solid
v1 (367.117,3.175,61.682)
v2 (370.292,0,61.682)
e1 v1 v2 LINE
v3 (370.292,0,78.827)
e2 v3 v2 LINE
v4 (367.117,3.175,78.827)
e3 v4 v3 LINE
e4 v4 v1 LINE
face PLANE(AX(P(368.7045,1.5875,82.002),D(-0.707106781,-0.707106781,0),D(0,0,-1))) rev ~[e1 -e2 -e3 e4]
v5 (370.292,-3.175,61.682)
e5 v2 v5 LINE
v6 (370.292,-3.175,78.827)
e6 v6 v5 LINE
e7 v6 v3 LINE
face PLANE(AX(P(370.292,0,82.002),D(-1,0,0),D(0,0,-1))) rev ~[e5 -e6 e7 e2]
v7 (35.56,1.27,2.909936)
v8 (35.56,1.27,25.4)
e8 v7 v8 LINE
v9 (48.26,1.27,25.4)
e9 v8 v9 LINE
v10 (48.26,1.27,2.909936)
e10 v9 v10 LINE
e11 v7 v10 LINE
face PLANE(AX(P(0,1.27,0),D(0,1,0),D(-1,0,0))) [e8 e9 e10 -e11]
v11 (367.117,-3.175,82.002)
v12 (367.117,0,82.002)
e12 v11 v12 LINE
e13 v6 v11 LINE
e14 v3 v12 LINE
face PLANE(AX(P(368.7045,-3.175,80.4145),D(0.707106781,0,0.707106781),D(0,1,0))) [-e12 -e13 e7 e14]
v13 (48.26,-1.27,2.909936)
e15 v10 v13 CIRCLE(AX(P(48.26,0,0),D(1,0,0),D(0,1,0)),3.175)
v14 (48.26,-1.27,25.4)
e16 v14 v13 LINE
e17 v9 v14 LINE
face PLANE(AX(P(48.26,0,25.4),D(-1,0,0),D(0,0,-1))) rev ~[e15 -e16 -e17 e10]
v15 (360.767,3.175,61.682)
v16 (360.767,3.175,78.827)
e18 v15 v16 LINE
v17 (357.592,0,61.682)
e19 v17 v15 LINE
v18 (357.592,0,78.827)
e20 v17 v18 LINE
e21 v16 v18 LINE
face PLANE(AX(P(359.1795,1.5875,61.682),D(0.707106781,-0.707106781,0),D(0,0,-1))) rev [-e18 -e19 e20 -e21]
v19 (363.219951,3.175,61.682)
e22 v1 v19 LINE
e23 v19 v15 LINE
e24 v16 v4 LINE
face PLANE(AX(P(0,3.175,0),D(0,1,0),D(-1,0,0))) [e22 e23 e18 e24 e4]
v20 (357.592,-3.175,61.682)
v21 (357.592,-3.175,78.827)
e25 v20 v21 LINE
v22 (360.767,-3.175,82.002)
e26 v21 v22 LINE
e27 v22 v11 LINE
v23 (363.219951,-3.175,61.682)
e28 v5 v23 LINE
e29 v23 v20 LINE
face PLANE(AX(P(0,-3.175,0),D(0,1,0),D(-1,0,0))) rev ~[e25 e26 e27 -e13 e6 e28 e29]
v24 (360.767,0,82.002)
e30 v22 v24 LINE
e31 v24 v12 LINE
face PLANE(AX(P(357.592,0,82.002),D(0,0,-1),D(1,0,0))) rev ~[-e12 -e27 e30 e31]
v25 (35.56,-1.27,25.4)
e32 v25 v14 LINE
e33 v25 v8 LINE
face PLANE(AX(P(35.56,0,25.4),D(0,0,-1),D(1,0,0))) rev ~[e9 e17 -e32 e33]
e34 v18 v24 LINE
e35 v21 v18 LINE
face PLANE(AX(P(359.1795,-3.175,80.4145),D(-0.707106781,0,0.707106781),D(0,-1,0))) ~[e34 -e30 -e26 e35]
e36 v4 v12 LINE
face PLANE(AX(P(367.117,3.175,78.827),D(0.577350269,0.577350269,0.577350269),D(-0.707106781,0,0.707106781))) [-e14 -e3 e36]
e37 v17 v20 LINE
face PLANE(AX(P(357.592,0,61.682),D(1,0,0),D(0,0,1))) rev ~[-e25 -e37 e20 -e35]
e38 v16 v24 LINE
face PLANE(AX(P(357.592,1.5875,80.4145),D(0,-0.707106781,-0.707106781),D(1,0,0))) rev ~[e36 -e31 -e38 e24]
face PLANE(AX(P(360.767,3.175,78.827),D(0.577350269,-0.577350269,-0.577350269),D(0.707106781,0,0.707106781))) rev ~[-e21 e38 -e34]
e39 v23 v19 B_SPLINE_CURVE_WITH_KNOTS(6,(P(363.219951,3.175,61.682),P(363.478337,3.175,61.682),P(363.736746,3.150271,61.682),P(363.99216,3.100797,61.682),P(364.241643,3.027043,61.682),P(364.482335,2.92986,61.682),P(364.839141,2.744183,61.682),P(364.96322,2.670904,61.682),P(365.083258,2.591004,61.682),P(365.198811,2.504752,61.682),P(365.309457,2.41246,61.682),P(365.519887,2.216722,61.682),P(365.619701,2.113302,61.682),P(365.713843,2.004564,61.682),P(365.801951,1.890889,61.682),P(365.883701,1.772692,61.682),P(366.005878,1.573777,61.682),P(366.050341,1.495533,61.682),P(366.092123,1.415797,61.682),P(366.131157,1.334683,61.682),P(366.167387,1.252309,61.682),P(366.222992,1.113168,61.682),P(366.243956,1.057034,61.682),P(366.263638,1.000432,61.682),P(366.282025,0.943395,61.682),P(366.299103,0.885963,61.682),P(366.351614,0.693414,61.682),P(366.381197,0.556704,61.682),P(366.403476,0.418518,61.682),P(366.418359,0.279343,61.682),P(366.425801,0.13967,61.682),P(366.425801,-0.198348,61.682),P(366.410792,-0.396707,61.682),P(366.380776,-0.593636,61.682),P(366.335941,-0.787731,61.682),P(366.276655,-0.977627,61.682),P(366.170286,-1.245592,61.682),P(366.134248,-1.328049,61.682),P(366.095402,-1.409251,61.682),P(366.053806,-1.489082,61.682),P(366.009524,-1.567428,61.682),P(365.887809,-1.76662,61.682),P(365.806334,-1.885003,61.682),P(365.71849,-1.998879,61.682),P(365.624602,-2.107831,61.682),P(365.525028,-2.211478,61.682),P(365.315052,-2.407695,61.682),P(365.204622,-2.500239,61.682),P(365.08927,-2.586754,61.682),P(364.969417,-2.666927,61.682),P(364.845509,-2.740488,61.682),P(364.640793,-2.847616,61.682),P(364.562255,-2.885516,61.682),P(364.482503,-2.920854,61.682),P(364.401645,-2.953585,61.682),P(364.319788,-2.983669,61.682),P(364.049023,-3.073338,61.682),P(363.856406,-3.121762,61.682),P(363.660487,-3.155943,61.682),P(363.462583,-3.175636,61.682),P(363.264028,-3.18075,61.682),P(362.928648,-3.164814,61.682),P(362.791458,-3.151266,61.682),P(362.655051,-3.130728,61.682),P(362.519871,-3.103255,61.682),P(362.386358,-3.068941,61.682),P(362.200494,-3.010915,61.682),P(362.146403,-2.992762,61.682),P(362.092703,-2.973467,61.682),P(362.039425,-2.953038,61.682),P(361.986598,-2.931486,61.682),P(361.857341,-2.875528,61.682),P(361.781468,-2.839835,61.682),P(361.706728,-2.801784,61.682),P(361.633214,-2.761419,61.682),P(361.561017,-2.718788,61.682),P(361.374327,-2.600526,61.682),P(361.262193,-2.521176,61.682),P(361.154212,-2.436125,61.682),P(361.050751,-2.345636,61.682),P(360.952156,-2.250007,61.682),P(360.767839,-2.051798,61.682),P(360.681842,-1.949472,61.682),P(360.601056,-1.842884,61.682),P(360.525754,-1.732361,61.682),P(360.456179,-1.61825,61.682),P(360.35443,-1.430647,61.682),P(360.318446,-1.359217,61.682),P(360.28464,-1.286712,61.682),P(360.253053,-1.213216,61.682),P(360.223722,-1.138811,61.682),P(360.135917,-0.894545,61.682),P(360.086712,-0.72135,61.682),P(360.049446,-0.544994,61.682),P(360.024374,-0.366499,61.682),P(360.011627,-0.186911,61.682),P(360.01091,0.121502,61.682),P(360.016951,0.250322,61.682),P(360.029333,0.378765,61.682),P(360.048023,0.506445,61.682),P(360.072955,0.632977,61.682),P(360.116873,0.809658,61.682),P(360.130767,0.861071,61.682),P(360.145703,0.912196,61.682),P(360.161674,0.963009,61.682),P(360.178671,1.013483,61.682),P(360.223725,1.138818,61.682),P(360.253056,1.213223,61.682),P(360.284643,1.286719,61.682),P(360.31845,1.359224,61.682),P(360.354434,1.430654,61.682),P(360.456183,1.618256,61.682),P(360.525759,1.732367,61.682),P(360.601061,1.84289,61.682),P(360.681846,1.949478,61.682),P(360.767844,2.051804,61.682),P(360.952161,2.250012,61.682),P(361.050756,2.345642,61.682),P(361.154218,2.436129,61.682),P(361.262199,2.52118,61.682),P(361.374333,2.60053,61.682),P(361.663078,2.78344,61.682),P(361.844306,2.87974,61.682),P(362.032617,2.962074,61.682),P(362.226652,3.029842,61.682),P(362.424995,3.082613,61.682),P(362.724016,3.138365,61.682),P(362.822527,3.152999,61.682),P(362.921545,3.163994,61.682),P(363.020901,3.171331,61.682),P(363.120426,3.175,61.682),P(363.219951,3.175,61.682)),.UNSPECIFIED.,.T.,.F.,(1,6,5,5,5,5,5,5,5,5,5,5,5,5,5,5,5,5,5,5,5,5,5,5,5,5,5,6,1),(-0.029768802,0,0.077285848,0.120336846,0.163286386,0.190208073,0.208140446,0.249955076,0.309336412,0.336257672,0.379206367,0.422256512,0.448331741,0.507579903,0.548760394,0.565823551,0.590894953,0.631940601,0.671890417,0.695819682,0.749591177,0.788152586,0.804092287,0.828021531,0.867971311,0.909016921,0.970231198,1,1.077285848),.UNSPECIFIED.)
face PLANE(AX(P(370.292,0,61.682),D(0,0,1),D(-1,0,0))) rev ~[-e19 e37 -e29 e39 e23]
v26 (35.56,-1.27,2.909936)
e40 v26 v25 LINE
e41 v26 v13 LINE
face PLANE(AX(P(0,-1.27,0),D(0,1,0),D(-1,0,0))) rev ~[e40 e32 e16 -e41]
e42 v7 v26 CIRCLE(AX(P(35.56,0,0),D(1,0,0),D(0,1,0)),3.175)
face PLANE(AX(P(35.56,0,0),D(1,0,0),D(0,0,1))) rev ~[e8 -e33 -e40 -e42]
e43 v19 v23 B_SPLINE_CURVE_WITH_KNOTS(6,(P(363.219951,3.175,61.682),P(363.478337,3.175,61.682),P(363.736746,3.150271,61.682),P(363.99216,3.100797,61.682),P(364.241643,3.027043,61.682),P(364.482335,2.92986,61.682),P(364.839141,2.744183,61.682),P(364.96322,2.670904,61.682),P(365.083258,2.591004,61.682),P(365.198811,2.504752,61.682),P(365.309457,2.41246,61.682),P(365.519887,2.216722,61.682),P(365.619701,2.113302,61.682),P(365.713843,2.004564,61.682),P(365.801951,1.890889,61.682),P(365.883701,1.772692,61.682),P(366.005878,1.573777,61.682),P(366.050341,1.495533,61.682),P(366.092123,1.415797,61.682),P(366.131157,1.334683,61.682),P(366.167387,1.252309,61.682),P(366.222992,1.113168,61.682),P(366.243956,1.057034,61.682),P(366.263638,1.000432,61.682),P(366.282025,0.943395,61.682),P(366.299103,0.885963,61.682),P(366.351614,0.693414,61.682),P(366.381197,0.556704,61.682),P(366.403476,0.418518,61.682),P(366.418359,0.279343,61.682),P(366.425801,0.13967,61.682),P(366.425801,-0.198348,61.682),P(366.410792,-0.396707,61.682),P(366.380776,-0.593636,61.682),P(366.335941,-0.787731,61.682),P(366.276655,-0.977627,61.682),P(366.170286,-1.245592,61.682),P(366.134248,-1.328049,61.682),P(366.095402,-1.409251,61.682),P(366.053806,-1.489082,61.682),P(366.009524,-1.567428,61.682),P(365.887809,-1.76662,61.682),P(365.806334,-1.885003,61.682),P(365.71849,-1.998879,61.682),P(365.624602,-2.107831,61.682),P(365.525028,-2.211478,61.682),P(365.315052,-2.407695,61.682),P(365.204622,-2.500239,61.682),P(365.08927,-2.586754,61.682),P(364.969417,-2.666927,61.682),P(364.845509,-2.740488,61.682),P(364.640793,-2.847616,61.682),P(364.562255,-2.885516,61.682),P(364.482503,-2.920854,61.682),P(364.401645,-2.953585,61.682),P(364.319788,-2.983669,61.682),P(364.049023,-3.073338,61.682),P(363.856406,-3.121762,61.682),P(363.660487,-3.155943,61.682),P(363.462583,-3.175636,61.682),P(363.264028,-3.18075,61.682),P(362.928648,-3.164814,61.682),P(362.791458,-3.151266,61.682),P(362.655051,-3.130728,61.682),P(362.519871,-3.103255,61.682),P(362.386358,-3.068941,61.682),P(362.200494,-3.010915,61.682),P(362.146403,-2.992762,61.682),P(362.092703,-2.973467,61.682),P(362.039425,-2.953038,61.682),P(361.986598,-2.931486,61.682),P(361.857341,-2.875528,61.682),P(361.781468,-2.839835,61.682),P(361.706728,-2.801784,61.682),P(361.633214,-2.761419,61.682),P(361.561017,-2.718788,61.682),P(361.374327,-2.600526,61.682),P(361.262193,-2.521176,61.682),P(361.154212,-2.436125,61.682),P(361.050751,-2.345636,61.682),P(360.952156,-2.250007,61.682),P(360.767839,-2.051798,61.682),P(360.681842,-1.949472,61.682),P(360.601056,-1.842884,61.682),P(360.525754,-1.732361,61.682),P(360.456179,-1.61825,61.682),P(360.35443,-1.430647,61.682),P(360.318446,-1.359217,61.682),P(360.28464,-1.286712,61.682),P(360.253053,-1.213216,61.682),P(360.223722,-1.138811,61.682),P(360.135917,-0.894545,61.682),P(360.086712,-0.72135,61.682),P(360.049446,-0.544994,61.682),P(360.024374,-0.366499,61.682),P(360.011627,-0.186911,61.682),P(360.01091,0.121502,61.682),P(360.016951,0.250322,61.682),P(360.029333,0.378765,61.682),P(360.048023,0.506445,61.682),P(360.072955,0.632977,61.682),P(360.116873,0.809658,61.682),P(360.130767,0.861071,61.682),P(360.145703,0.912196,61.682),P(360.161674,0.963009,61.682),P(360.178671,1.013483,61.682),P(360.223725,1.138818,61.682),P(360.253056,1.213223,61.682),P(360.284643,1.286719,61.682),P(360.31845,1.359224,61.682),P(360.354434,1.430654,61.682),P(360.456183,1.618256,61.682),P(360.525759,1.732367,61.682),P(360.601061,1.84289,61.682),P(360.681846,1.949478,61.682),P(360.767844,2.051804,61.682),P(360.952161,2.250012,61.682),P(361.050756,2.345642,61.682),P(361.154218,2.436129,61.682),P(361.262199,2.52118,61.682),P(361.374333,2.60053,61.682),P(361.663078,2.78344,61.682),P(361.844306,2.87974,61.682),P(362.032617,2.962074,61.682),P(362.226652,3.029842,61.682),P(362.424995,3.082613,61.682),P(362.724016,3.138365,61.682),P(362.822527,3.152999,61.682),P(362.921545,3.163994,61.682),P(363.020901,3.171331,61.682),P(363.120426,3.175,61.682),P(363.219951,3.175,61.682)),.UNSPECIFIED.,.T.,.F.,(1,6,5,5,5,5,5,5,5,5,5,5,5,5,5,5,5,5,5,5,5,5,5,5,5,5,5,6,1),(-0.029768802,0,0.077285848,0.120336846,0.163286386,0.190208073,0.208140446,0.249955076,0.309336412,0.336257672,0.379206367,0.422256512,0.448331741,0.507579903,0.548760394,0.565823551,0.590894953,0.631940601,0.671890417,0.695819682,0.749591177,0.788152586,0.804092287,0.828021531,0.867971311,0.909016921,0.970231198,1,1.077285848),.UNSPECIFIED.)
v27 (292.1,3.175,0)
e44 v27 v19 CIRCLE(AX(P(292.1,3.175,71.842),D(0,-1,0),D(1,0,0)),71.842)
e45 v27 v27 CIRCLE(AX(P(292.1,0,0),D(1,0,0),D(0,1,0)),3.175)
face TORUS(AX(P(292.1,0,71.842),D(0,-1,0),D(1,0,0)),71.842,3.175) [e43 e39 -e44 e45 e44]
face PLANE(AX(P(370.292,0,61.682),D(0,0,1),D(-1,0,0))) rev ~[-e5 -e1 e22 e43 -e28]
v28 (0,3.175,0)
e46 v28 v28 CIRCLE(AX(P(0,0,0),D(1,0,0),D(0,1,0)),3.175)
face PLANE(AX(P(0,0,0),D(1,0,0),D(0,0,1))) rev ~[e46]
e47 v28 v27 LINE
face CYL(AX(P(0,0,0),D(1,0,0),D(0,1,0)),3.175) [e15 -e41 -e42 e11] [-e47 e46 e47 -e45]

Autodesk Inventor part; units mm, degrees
ref_plane "YZ Plane" through (0, 0, 0) normal (1, 0, 0) x (0, 1, 0)
ref_plane "XZ Plane" through (0, 0, 0) normal (0, 1, 0) x (-1, 0, 0)
ref_plane "XY Plane" through (0, 0, 0) normal (0, 0, 1) x (1, 0, 0)
sketch "Sketch1" plane through (0, 0, 0) normal (1, 0, 0) x (0, 1, 0)
  circle A0 centre (0, 0) radius 3.175
  dimension "d0" = 6.35
sketch "Sketch2" plane through (0, 0, 0) normal (0, 1, 0) x (-1, 0, 0)
  line L0 (0, 0) -> (-292.1, 0)
  arc A0 (-363.942, 71.842) -> (-292.1, 0) centre (-292.1, 71.842) ccw
  line L1 (-292.1, 0) -> (-363.942, 71.842) construction
  line L2 (-292.1, 0) -> (-190.5, 0) construction
  dimension "d1" = 292.1
  dimension "d2" = 101.6
  dimension "d3" = 135
sweep "Sweep1" add profiles "Sketch1" path "Sketch2"
sketch "Sketch3" plane through (0, 0, 0) normal (0, 1, 0) x (-1, 0, 0)
  line L0 (-357.592, 82.002) -> (-370.292, 82.002)
  line L1 (-370.292, 82.002) -> (-370.292, 61.682)
  line L2 (-370.292, 61.682) -> (-357.592, 61.682)
  line L3 (-357.592, 61.682) -> (-357.592, 82.002)
  line L4 (-360.767, 71.842) -> (-367.117, 71.842) projected
  line L5 (-357.592, 82.002) -> (-370.292, 61.682) construction
  line L6 (-370.292, 82.002) -> (-357.592, 61.682) construction
  point P0 (0, 0)
  point P1 (-363.942, 71.842)
  dimension "d6" = 12.7
  dimension "d7" = 20.32
extrude "Extrusion1" add sketch "Sketch3" along normal mid plane 6.35
chamfer "Chamfer1" distance 3.175 angle 45 5 edges at (370.292, 0, 82.002) (357.592, 0, 82.002) (357.592, 3.175, 71.842) (370.292, 3.175, 71.842) (363.942, 3.175, 82.002)
sketch "Sketch4" plane through (0, 0, 0) normal (0, 1, 0) x (-1, 0, 0)
  line L0 (0, 0) -> (-2.54, 0)
  line L1 (-2.54, 0) -> (-81.28, 0)
  line L2 (-35.56, 25.4) -> (-48.26, 25.4)
  line L3 (-48.26, 25.4) -> (-48.26, -25.4)
  line L4 (-48.26, -25.4) -> (-35.56, -25.4)
  line L5 (-35.56, -25.4) -> (-35.56, 25.4)
  line L6 (-35.56, 25.4) -> (-48.26, -25.4) construction
  line L7 (-48.26, 25.4) -> (-35.56, -25.4) construction
  line L8 (-35.56, 0) -> (-48.26, 0)
  point P0 (-41.91, 0)
  point P1 (-48.26, 0)
  point P2 (-35.56, 0)
  dimension "d13" = 2.54
  dimension "d14" = 78.74
  dimension "d15" = 12.7
  dimension "d16" = 50.8
extrude "Extrusion2" add sketch "Sketch4" along normal mid plane 2.54 contours L1 L3 L2 L5
properties part number "Height adjust(H)"
